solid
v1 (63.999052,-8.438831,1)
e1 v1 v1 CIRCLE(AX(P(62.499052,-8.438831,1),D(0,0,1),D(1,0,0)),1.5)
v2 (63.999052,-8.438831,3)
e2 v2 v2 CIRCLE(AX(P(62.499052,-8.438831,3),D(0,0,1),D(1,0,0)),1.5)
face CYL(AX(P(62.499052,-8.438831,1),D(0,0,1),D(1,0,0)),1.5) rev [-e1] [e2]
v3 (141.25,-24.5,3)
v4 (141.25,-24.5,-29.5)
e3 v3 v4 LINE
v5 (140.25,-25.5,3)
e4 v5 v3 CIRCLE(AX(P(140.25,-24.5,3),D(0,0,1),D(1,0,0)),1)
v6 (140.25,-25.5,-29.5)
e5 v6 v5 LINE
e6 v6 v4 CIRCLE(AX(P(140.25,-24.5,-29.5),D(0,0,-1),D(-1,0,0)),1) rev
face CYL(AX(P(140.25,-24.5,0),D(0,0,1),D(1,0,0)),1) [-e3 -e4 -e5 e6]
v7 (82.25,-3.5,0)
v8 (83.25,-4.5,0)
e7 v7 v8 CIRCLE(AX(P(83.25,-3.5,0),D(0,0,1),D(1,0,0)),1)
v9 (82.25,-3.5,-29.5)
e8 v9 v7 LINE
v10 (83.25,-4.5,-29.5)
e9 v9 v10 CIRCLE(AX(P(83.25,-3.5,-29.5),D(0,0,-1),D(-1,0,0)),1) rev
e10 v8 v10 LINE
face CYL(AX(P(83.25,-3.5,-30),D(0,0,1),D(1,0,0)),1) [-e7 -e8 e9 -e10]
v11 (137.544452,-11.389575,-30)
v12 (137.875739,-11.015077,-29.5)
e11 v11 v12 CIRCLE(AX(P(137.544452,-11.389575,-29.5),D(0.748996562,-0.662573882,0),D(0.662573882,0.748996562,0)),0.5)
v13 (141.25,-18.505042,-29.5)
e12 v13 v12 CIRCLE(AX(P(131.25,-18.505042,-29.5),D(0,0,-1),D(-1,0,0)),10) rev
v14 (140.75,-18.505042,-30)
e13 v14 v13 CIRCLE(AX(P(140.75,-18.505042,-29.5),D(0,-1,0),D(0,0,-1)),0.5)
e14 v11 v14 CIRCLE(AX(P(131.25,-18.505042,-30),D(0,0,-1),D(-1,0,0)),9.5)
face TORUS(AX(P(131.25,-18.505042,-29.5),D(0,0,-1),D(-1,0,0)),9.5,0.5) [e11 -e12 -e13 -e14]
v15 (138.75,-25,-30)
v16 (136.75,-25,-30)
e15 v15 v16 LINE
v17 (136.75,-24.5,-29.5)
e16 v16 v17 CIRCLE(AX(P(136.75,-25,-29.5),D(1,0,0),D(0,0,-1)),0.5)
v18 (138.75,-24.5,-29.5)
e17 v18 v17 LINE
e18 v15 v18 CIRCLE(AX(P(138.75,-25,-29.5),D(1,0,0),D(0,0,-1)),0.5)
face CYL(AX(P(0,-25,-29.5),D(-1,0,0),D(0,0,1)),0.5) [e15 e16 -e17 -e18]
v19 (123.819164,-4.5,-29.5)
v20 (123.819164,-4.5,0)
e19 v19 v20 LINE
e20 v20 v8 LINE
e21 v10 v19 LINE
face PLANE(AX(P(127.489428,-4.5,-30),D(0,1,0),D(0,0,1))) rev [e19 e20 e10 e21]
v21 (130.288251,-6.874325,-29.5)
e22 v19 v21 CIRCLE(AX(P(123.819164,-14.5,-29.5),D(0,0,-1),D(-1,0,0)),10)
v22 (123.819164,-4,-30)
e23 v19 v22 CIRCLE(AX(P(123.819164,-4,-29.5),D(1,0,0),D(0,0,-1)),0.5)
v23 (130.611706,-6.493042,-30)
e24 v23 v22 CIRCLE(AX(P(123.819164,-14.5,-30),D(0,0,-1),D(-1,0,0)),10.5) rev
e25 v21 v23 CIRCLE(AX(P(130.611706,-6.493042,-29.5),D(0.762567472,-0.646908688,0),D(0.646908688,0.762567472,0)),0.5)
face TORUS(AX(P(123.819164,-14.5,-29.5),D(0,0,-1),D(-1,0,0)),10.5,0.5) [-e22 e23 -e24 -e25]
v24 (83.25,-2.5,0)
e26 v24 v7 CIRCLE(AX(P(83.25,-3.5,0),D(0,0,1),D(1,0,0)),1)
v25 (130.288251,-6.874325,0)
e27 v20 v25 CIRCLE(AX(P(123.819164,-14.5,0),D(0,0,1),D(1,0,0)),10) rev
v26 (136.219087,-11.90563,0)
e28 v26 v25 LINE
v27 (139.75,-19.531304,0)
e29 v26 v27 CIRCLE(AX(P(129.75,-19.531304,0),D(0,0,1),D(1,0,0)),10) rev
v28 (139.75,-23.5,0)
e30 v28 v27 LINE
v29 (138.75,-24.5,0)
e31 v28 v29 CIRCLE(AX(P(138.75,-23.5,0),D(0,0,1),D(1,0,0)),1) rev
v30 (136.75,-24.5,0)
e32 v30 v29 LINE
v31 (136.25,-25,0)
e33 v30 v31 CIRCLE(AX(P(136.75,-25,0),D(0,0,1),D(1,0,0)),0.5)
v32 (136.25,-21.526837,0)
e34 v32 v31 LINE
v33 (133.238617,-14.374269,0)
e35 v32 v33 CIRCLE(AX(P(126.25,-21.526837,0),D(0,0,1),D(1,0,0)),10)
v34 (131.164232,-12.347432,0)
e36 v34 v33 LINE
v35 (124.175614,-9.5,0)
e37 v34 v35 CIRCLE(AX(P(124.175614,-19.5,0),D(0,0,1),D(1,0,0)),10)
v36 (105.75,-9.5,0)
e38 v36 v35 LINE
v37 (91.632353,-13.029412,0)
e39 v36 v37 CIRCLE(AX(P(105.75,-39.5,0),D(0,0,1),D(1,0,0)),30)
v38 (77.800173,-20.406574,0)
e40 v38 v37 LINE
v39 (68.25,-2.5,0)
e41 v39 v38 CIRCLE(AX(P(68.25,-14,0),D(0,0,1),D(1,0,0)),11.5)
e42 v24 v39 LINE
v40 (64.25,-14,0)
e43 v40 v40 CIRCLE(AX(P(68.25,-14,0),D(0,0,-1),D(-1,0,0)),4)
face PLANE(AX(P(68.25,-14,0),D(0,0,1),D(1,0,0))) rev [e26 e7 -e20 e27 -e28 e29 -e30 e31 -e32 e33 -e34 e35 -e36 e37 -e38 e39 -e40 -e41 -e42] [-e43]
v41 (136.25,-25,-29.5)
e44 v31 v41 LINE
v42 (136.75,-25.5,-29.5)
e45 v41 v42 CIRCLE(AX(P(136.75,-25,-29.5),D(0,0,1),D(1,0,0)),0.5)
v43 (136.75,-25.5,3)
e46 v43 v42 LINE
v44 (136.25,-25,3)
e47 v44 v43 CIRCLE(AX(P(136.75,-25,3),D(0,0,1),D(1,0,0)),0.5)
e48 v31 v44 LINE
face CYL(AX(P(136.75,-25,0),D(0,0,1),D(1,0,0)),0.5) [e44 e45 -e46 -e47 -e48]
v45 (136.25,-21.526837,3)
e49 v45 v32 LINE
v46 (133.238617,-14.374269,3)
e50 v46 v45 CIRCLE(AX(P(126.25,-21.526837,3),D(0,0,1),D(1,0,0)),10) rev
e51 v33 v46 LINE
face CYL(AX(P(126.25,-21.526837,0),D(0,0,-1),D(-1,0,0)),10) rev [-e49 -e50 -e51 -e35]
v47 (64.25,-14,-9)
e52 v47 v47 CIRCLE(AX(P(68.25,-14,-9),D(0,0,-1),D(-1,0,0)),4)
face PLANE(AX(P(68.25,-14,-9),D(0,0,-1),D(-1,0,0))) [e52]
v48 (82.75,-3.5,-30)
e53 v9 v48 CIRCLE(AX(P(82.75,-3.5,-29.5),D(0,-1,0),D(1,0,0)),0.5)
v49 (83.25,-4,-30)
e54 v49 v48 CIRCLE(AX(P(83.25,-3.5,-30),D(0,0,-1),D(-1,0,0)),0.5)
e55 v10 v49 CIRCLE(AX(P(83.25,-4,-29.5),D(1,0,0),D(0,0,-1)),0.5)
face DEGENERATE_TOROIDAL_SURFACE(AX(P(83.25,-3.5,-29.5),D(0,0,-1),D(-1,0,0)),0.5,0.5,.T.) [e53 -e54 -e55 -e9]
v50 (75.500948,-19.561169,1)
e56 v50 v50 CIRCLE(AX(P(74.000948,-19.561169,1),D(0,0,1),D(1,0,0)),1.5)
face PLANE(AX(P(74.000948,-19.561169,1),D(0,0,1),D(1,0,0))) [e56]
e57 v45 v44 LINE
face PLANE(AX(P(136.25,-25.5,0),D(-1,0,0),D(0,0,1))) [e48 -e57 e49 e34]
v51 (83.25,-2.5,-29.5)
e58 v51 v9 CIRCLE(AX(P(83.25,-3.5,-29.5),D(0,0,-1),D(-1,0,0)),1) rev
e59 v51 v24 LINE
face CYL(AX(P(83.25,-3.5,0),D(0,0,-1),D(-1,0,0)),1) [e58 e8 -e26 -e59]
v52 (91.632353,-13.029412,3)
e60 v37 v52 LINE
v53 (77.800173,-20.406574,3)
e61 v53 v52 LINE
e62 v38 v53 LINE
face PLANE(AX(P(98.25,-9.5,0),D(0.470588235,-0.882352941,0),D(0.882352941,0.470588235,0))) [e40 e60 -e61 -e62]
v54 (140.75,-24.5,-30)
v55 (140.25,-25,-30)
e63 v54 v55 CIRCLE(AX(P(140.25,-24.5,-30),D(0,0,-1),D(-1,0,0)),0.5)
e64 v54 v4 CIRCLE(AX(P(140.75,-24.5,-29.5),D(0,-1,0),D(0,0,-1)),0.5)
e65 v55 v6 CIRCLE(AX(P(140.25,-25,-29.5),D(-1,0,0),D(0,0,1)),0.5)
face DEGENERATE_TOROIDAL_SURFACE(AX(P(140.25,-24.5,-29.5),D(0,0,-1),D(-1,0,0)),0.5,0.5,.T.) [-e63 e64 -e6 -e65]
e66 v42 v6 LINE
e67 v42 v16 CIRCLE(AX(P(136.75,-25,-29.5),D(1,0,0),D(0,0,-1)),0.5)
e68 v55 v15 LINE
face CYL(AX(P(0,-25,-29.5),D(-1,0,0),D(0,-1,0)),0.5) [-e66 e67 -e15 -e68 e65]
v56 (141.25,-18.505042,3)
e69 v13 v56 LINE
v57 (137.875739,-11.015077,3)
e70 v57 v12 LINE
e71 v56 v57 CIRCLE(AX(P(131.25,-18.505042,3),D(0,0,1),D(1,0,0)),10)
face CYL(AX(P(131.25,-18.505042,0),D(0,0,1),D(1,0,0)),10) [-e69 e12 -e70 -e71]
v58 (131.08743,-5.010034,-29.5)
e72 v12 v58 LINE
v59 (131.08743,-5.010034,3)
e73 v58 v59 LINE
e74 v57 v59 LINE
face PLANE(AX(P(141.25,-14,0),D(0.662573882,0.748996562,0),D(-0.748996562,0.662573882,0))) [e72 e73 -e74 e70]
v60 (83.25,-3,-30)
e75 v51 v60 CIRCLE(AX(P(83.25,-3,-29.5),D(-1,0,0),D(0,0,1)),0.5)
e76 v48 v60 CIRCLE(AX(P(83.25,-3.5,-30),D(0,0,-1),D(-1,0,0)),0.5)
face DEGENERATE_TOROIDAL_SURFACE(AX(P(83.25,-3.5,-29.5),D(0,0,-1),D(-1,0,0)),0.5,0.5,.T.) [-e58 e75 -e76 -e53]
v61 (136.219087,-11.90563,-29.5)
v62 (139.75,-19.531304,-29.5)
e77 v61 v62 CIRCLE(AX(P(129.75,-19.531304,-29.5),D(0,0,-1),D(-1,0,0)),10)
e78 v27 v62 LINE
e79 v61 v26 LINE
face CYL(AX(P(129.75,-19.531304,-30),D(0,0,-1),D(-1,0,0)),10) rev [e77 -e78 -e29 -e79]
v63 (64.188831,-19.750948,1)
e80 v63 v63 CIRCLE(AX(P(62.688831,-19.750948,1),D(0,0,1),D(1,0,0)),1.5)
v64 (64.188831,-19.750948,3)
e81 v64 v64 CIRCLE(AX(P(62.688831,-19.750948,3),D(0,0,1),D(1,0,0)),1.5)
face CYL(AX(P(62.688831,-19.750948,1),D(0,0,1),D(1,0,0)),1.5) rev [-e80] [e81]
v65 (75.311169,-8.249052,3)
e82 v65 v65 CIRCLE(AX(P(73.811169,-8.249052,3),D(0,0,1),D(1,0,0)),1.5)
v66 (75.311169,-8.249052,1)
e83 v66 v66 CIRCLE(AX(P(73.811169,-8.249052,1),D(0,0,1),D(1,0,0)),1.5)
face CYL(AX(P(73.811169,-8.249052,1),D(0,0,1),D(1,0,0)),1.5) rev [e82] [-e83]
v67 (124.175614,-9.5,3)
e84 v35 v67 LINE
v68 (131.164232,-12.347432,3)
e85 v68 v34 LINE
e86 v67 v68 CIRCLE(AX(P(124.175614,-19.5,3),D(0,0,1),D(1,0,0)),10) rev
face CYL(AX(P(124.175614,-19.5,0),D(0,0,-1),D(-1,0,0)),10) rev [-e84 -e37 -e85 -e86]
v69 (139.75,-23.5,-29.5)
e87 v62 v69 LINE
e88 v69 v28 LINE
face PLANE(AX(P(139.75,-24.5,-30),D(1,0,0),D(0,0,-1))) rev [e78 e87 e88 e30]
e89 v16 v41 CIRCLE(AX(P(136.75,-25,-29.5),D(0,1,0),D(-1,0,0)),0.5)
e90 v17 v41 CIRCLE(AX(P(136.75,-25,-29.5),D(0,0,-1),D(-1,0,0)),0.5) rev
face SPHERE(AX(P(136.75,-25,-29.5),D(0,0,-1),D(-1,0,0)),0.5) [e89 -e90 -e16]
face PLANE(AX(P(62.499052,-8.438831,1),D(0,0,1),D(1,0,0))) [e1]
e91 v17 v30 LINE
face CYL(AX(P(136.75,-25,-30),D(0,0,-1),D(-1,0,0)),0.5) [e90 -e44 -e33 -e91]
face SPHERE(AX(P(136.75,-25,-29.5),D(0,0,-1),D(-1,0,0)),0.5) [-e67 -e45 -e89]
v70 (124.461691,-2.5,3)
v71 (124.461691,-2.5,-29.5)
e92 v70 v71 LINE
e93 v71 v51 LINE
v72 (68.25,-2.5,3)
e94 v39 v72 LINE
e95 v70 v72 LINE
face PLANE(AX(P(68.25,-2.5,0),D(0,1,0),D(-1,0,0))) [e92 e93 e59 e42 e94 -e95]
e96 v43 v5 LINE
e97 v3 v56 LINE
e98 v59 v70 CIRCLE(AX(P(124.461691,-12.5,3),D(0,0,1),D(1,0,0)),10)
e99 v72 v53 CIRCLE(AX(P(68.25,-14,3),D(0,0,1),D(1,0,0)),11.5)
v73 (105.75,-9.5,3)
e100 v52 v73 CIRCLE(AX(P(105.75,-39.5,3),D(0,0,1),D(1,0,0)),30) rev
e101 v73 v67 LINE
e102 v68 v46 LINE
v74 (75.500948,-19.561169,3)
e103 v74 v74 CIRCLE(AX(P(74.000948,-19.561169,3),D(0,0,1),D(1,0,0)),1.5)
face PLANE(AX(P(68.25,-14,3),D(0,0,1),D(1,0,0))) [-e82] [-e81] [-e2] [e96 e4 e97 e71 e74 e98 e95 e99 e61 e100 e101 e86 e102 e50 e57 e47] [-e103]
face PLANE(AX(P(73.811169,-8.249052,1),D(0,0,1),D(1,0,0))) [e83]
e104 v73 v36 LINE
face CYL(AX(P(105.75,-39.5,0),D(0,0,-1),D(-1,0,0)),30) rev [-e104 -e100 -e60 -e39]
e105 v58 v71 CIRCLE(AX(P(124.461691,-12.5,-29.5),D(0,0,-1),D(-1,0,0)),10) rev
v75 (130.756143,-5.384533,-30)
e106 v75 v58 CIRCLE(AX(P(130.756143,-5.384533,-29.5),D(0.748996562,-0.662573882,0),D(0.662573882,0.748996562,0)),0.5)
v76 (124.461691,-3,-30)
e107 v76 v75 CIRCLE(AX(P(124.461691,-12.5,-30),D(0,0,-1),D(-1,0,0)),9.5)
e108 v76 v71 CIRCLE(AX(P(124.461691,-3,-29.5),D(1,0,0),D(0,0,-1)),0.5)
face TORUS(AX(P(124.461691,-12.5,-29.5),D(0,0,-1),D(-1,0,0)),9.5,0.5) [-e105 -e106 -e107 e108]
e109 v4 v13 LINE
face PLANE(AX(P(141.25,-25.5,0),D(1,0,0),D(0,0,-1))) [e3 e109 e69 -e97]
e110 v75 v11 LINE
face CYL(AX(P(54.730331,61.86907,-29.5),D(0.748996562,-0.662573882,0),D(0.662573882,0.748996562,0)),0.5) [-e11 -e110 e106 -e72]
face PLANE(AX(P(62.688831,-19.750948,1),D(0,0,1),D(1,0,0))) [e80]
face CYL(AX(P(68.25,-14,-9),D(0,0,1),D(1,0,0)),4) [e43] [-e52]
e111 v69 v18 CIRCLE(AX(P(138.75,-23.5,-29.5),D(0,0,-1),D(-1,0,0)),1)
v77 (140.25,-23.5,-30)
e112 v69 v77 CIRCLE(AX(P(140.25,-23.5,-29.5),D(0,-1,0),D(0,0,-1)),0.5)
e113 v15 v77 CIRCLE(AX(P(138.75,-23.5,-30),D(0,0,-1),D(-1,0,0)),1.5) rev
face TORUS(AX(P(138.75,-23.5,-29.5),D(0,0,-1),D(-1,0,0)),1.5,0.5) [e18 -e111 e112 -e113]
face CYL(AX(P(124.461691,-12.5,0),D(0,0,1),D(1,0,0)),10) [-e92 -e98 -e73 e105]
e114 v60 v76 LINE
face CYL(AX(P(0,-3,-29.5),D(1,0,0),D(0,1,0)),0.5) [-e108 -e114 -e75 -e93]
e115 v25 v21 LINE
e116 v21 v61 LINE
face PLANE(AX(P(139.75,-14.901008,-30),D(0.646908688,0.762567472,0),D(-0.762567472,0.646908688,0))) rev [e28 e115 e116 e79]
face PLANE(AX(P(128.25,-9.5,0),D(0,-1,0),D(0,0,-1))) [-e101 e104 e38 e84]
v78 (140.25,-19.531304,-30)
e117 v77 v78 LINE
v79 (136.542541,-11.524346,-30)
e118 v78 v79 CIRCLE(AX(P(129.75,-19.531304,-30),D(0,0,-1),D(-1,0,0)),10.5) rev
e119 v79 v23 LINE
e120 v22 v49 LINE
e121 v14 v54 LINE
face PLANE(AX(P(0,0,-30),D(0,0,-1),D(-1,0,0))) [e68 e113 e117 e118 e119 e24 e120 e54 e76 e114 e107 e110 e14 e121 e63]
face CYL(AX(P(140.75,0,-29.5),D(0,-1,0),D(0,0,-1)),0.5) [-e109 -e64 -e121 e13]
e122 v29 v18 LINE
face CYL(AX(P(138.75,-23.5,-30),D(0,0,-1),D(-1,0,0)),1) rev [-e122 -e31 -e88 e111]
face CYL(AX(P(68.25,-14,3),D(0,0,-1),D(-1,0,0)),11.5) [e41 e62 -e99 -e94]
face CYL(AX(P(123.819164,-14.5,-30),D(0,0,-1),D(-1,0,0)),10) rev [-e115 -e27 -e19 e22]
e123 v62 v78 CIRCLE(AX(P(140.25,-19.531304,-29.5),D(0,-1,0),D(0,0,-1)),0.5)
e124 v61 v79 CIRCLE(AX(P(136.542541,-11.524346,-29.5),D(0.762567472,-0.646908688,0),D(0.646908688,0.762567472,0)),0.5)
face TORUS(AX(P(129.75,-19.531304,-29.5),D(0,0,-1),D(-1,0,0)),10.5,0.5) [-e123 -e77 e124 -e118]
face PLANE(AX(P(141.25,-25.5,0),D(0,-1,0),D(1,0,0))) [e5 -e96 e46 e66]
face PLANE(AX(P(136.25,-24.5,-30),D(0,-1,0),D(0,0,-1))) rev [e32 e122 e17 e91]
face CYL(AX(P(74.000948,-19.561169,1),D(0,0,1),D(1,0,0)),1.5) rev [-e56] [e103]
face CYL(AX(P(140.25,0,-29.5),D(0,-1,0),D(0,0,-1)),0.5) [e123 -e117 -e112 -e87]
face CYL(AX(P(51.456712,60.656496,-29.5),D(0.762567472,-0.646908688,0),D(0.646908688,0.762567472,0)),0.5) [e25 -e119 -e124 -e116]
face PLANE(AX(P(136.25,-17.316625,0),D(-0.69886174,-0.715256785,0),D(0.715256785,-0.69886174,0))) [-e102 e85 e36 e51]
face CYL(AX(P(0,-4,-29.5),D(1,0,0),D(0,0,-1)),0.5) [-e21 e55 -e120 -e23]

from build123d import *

# Parameters (mm, degrees)
SZKIC1_R                    = 11.5
DODANIE_WYCI_GNI_CIE1_DEPTH = 3
SZKIC2_R                    = 4
DODANIE_WYCI_GNI_CIE2_DEPTH = 9
SZKIC3_R                    = 1.5
WYTNIJ_WYCI_GNI_CIE1_DEPTH  = 2
DODANIE_WYCI_GNI_CIE3_DEPTH = 3
DODANIE_WYCI_GNI_CIE4_DEPTH = 30
ZAOKR_GLENIE1_R             = 10
ZAOKR_GLENIE2_R             = 30
ZAOKR_GLENIE6_R             = 1
ZAOKR_GLENIE8_R             = 0.5
ZAOKR_GLENIE9_R             = 0.5


with BuildPart() as part:
    # Szkic1 → Dodanie-wyciągnięcie1 (new body)
    with BuildSketch(Plane.XY):
        with Locations((68.25, -14)):
            Circle(SZKIC1_R)
    extrude(amount=DODANIE_WYCI_GNI_CIE1_DEPTH)

    # Szkic2 → Dodanie-wyciągnięcie2 (add)
    with BuildSketch(Plane(origin=(0, 0, 0), x_dir=(-1, 0, 0), z_dir=(0, 0, -1))):
        with Locations((-68.25, -14)):
            Circle(SZKIC2_R)
    extrude(amount=DODANIE_WYCI_GNI_CIE2_DEPTH)

    # Szkic3 → Wytnij-wyciągnięcie1 (cut)
    with BuildSketch(Plane.XY.offset(3)):
        with Locations((74.000947528, -19.561169169)):
            Circle(SZKIC3_R)
        with Locations((73.811169169, -8.249052472)):
            Circle(SZKIC3_R)
        with Locations((62.499052472, -8.438830831)):
            Circle(SZKIC3_R)
        with Locations((62.688830831, -19.750947528)):
            Circle(SZKIC3_R)
    extrude(amount=-WYTNIJ_WYCI_GNI_CIE1_DEPTH, mode=Mode.SUBTRACT)

    # Szkic4 → Dodanie-wyciągnięcie3 (add)
    with BuildSketch(Plane.XY.offset(3)):
        Polygon((68.25, -2.5), (128.25, -2.5), (141.25, -14), (141.25, -25.5), (136.25, -25.5), (136.25, -17.31662479), (128.25, -9.5), (98.25, -9.5), (77.80017301, -20.406574394), (76.895320055, -6.416567983), align=None)
    extrude(amount=-DODANIE_WYCI_GNI_CIE3_DEPTH)

    # Szkic6 → Dodanie-wyciągnięcie4 (add)
    with BuildSketch(Plane(origin=(0, 0, 0), x_dir=(-1, 0, 0), z_dir=(0, 0, -1))):
        Polygon((-82.25, -2.5), (-128.25, -2.5), (-141.25, -14), (-141.25, -25.5), (-136.25, -25.5), (-136.25, -24.5), (-139.75, -24.5), (-139.75, -14.901008455), (-127.489427722, -4.5), (-82.25, -4.5), align=None)
    extrude(amount=DODANIE_WYCI_GNI_CIE4_DEPTH)

    # Zaokrąglenie1
    zaokr_glenie1_edges = [part.edges().sort_by_distance(p)[0] for p in [
        (128.25, -2.5, -13.5),
        (141.25, -14, -13.5),
        (136.25, -17.31662479, 1.5),
        (128.25, -9.5, 1.5),
        (139.75, -14.901008455, -15),
        (127.489427722, -4.5, -15),
    ]]
    fillet(zaokr_glenie1_edges, radius=ZAOKR_GLENIE1_R)

    # Zaokrąglenie2
    zaokr_glenie2_edges = [part.edges().sort_by_distance(p)[0] for p in [
        (98.25, -9.5, 1.5),
    ]]
    fillet(zaokr_glenie2_edges, radius=ZAOKR_GLENIE2_R)

    # Zaokrąglenie6
    zaokr_glenie6_edges = [part.edges().sort_by_distance(p)[0] for p in [
        (141.25, -25.5, -13.5),
        (139.75, -24.5, -15),
        (82.25, -2.5, -15),
        (82.25, -4.5, -15),
    ]]
    fillet(zaokr_glenie6_edges, radius=ZAOKR_GLENIE6_R - 0.0001)  # a hair under: the kernel refuses the full size

    # Zaokrąglenie8
    zaokr_glenie8_edges = [part.edges().sort_by_distance(p)[0] for p in [
        (136.25, -25.5, -13.5),
        (136.25, -24.5, -15),
    ]]
    fillet(zaokr_glenie8_edges, radius=ZAOKR_GLENIE8_R - 0.0001)  # a hair under: the kernel refuses the full size

    # Zaokrąglenie9
    zaokr_glenie9_edges = [part.edges().sort_by_distance(p)[0] for p in [
        (141.25, -21.502571138, -30),
        (140.36749385, -14.397572751, -30),
        (128.004313516, -3.148538717, -30),
        (138.824438517, -15.329570819, -30),
        (127.264686983, -5.112328638, -30),
        (103.855795671, -2.5, -30),
        (138.5, -25.5, -30),
        (139.75, -21.515702231, -30),
        (140.957136071, -25.207136071, -30),
        (82.542863929, -4.207136071, -30),
        (82.542863929, -2.792863929, -30),
        (139.457136071, -24.207136071, -30),
        (137.75, -24.5, -30),
        (136.39641732, -24.64641732, -30),
        (136.39641732, -25.35358268, -30),
        (133.253669041, -9.38997751, -30),
        (103.534532162, -4.5, -30),
        (134.481584493, -8.012555513, -30),
    ]]
    fillet(zaokr_glenie9_edges, radius=ZAOKR_GLENIE9_R - 0.0001)  # a hair under: the kernel refuses the full size


solid = part.part
